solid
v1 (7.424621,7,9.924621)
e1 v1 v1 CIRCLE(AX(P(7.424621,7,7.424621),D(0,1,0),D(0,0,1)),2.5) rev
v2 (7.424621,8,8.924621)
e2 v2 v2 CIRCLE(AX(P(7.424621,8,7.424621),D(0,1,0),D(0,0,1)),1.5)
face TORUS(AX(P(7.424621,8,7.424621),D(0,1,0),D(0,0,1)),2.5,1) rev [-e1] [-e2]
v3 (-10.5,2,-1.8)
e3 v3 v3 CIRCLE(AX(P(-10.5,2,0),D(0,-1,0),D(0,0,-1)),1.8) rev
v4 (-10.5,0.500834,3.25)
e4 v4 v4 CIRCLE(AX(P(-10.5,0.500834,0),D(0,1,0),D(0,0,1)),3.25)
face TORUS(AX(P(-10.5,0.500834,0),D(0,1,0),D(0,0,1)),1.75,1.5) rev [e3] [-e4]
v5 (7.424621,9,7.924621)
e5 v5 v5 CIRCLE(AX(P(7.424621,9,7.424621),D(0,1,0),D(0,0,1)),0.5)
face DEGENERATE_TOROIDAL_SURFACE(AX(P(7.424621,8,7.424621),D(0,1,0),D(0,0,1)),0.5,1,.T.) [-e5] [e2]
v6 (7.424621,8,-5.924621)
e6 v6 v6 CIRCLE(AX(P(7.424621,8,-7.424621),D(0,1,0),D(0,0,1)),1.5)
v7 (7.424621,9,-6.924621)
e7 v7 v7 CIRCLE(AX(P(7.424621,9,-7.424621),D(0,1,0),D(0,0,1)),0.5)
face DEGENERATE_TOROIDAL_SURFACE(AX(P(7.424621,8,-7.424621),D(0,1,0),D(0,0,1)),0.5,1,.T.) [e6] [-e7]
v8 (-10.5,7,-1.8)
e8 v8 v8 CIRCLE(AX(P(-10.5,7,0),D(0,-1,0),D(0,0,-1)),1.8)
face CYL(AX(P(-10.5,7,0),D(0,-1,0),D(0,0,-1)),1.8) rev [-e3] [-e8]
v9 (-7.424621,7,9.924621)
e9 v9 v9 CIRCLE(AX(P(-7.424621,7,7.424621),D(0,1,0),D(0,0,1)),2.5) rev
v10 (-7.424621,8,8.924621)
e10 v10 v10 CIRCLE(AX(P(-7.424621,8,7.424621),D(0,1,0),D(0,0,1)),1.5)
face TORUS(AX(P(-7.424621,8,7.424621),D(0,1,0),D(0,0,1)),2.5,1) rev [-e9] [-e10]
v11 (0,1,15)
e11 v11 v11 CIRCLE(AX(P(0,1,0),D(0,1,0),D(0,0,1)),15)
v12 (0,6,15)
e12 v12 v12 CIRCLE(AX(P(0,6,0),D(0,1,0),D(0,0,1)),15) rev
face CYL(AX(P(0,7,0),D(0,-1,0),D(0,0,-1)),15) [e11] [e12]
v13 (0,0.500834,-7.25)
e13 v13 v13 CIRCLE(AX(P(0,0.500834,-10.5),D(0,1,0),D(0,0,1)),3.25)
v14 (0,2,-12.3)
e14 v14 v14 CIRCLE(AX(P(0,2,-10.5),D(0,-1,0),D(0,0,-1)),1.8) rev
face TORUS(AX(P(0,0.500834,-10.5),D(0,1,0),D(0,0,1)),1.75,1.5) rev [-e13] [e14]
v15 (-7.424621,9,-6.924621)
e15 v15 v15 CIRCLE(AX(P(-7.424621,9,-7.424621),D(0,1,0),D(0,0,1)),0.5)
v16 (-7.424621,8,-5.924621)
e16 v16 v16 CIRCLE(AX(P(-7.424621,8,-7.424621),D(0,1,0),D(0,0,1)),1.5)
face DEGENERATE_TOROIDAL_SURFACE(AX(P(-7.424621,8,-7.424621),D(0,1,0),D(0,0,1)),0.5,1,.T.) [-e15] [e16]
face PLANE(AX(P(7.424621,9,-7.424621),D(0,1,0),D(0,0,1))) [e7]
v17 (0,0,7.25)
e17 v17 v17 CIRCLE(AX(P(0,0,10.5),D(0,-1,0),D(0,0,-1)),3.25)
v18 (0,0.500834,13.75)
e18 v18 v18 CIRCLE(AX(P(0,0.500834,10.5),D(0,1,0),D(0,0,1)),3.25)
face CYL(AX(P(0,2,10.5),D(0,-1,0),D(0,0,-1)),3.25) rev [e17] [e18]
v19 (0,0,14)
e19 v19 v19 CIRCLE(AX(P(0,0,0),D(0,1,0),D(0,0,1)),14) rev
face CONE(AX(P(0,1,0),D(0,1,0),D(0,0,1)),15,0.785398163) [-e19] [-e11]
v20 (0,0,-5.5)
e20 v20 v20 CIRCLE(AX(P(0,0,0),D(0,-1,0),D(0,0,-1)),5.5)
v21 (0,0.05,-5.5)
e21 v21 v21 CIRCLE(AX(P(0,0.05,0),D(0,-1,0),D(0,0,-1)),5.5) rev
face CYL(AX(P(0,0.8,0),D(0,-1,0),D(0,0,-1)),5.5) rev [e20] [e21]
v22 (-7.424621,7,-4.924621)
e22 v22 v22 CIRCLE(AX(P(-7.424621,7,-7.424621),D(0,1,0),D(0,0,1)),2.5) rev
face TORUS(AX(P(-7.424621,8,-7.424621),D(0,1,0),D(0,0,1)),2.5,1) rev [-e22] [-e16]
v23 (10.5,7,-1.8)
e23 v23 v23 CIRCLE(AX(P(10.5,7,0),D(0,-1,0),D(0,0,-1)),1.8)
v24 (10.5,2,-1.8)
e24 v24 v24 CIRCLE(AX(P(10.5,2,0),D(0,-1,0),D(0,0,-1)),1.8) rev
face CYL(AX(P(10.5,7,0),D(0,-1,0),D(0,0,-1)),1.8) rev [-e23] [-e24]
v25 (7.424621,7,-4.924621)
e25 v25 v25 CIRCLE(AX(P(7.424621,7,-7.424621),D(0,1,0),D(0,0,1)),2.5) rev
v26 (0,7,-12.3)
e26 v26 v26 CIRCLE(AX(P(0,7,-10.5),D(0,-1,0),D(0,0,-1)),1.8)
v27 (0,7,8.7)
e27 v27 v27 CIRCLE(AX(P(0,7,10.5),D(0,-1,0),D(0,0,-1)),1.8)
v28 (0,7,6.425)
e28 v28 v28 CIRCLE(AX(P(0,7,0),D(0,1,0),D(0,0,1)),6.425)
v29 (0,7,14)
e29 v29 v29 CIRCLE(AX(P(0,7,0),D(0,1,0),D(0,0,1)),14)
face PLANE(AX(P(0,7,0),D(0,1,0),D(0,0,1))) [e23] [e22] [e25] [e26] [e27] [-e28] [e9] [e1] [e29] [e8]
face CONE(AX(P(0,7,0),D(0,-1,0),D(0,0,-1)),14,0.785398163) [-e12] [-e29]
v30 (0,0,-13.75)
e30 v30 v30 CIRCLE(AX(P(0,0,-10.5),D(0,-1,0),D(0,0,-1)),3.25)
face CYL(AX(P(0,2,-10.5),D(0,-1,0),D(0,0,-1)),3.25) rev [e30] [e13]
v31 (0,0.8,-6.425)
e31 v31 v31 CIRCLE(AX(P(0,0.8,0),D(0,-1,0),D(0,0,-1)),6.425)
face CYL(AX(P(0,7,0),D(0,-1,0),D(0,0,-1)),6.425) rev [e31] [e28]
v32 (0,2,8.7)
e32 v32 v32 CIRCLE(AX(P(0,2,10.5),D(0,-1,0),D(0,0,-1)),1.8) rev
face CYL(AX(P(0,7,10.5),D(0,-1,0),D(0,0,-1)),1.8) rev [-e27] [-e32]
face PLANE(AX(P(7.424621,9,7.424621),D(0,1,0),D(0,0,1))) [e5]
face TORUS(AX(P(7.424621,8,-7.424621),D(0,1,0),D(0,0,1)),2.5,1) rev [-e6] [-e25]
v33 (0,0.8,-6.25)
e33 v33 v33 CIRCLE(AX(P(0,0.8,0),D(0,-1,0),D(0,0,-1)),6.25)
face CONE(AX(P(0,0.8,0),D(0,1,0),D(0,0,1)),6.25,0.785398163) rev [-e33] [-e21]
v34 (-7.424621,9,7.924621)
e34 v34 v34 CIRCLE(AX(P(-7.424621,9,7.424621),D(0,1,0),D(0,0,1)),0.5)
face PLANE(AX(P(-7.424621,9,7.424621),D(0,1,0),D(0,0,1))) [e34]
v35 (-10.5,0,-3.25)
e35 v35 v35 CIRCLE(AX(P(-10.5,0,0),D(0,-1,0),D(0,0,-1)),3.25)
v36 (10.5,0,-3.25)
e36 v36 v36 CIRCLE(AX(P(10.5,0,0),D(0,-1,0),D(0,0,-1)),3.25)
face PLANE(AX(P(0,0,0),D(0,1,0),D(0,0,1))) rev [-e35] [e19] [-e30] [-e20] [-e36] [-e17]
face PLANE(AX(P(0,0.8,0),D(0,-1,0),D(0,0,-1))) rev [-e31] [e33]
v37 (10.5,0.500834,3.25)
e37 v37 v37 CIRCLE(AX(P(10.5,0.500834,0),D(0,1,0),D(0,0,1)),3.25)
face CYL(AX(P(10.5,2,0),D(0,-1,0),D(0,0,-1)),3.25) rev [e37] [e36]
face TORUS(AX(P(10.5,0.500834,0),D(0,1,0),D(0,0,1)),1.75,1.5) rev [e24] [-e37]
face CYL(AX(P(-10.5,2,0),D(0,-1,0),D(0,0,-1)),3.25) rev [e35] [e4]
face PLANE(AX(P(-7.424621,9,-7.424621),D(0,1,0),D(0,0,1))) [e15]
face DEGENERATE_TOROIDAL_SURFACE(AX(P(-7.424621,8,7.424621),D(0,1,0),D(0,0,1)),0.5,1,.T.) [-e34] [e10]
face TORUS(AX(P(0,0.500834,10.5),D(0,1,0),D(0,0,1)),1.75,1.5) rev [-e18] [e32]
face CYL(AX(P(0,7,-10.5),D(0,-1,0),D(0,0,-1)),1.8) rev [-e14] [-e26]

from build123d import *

# Parameters (mm, degrees)
SKETCH1_R           = 15
SKETCH1_R_2         = 6.425
BOSS_EXTRUDE1_DEPTH = 7
SKETCH2_R           = 1.8
CUT_EXTRUDE1_DEPTH  = 23.338307904
SKETCH3_R           = 3.25
CUT_EXTRUDE2_DEPTH  = 2
FILLET1_R           = 1.5
CHAMFER1_SIZE       = 1
CHAMFER2_SIZE       = 1
SKETCH4_R           = 1.5
BOSS_EXTRUDE2_DEPTH = 2
FILLET2_R           = 1
SKETCH5_R           = 6.679859281
SKETCH5_R_2         = 5.5
BOSS_EXTRUDE3_DEPTH = 0.8
CHAMFER3_SIZE       = 0.75


# Some blends are built 0.0001 mm under size
with BuildPart() as part:
    # Sketch1 → Boss-Extrude1 (new body)
    with BuildSketch(Plane(origin=(0, 0, 0), x_dir=(1, 0, 0), z_dir=(0, 1, 0))):
        with Locations(Location((0, 0, 0), (0, 0, 270))):
            Circle(SKETCH1_R)
        with Locations(Location((0, 0, 0), (0, 0, 270))):
            Circle(SKETCH1_R_2, mode=Mode.SUBTRACT)
    extrude(amount=BOSS_EXTRUDE1_DEPTH)

    # Sketch2 → Cut-Extrude1 (cut, through all)
    with BuildSketch(Plane.XZ):
        with Locations(Location((0, 10.5, 0), (0, 0, 270))):
            Circle(SKETCH2_R)
        with Locations(Location((10.5, 0, 0), (0, 0, 270))):
            Circle(SKETCH2_R)
        with Locations(Location((0, -10.5, 0), (0, 0, 270))):
            Circle(SKETCH2_R)
        with Locations(Location((-10.5, 0, 0), (0, 0, 270))):
            Circle(SKETCH2_R)
    extrude(amount=-CUT_EXTRUDE1_DEPTH, mode=Mode.SUBTRACT)

    # Sketch3 → Cut-Extrude2 (cut)
    with BuildSketch(Plane.XZ):
        with Locations(Location((0, 10.5, 0), (0, 0, 270))):
            Circle(SKETCH3_R)
        with Locations(Location((10.5, 0, 0), (0, 0, 270))):
            Circle(SKETCH3_R)
        with Locations(Location((0, -10.5, 0), (0, 0, 270))):
            Circle(SKETCH3_R)
        with Locations(Location((-10.5, 0, 0), (0, 0, 270))):
            Circle(SKETCH3_R)
    extrude(amount=-CUT_EXTRUDE2_DEPTH, mode=Mode.SUBTRACT)

    # Fillet1
    # the kernel refuses this fillet: 1.5 mm, written as the material it adds along each edge
    with BuildSketch(Plane(origin=(0, 2, 10.5), x_dir=(0, 0, -1), z_dir=(-1, 0, 0))) as fillet1_piece_1_section:
        with BuildLine():
            CenterArc((3.25 - FILLET1_R, FILLET1_R), FILLET1_R, 270, 90)
            Line((3.25 - FILLET1_R, 0), (3.25, 0))
            Line((3.25, 0), (3.25, FILLET1_R))
        make_face()
    fillet1_piece_1 = revolve(axis=Axis((0, 2, 10.5), (0, -1, 0)), mode=Mode.PRIVATE)
    fillet1_piece_1 = fillet1_piece_1 - Plane(origin=(0, 1.558044344, 10.5), x_dir=(0, 0, -1), z_dir=(0, -1, 0)) * Cylinder(1.8, 13, mode=Mode.PRIVATE)
    add(fillet1_piece_1)
    with BuildSketch(Plane(origin=(10.5, 2, 0), x_dir=(0, 0, -1), z_dir=(-1, 0, 0))) as fillet1_piece_2_section:
        with BuildLine():
            CenterArc((3.25 - FILLET1_R, FILLET1_R), FILLET1_R, 270, 90)
            Line((3.25 - FILLET1_R, 0), (3.25, 0))
            Line((3.25, 0), (3.25, FILLET1_R))
        make_face()
    fillet1_piece_2 = revolve(axis=Axis((10.5, 2, 0), (0, -1, 0)), mode=Mode.PRIVATE)
    fillet1_piece_2 = fillet1_piece_2 - Plane(origin=(10.5, 1.558044344, 0), x_dir=(0, 0, -1), z_dir=(0, -1, 0)) * Cylinder(1.8, 14, mode=Mode.PRIVATE)
    add(fillet1_piece_2)
    with BuildSketch(Plane(origin=(0, 2, -10.5), x_dir=(0, 0, -1), z_dir=(-1, 0, 0))) as fillet1_piece_3_section:
        with BuildLine():
            CenterArc((3.25 - FILLET1_R, FILLET1_R), FILLET1_R, 270, 90)
            Line((3.25 - FILLET1_R, 0), (3.25, 0))
            Line((3.25, 0), (3.25, FILLET1_R))
        make_face()
    fillet1_piece_3 = revolve(axis=Axis((0, 2, -10.5), (0, -1, 0)), mode=Mode.PRIVATE)
    fillet1_piece_3 = fillet1_piece_3 - Plane(origin=(0, 1.558044344, -10.5), x_dir=(0, 0, -1), z_dir=(0, -1, 0)) * Cylinder(1.8, 14, mode=Mode.PRIVATE)
    add(fillet1_piece_3)
    with BuildSketch(Plane(origin=(-10.5, 2, 0), x_dir=(0, 0, -1), z_dir=(-1, 0, 0))) as fillet1_piece_4_section:
        with BuildLine():
            CenterArc((3.25 - FILLET1_R, FILLET1_R), FILLET1_R, 270, 90)
            Line((3.25 - FILLET1_R, 0), (3.25, 0))
            Line((3.25, 0), (3.25, FILLET1_R))
        make_face()
    fillet1_piece_4 = revolve(axis=Axis((-10.5, 2, 0), (0, -1, 0)), mode=Mode.PRIVATE)
    fillet1_piece_4 = fillet1_piece_4 - Plane(origin=(-10.5, 1.558044344, 0), x_dir=(0, 0, -1), z_dir=(0, -1, 0)) * Cylinder(1.8, 13, mode=Mode.PRIVATE)
    add(fillet1_piece_4)

    # Chamfer1
    chamfer1_edges = [part.edges().sort_by_distance(p)[0] for p in [
        (0, 7, -15),
    ]]
    chamfer(chamfer1_edges, length=CHAMFER1_SIZE)

    # Chamfer2
    chamfer2_edges = [part.edges().sort_by_distance(p)[0] for p in [
        (0, 0, -15),
    ]]
    chamfer(chamfer2_edges, length=CHAMFER2_SIZE)

    # Sketch4 → Boss-Extrude2 (add)
    with BuildSketch(Plane(origin=(0, 7, 0), x_dir=(1, 0, 0), z_dir=(0, 1, 0))):
        with Locations(Location((7.424621202, 7.424621202, 0), (0, 0, 270))):
            Circle(SKETCH4_R)
        with Locations(Location((7.424621202, -7.424621202, 0), (0, 0, 270))):
            Circle(SKETCH4_R)
        with Locations(Location((-7.424621202, -7.424621202, 0), (0, 0, 270))):
            Circle(SKETCH4_R)
        with Locations(Location((-7.424621202, 7.424621202, 0), (0, 0, 270))):
            Circle(SKETCH4_R)
    extrude(amount=BOSS_EXTRUDE2_DEPTH)

    # Fillet2
    fillet2_edges = [part.edges().sort_by_distance(p)[0] for p in [
        (7.424621202, 7, -8.924621202),
        (7.424621202, 9, -8.924621202),
        (7.424621202, 7, 5.924621202),
        (7.424621202, 9, 5.924621202),
        (-7.424621202, 7, 5.924621202),
        (-7.424621202, 9, 5.924621202),
        (-7.424621202, 7, -8.924621202),
        (-7.424621202, 9, -8.924621202),
    ]]
    fillet(fillet2_edges, radius=FILLET2_R - 0.0001)  # a hair under: the kernel refuses the full size

    # Sketch5 → Boss-Extrude3 (add)
    with BuildSketch(Plane.XZ):
        Circle(SKETCH5_R)
        with Locations(Location((0, 0, 0), (0, 0, 270))):
            Circle(SKETCH5_R_2, mode=Mode.SUBTRACT)
    extrude(amount=-BOSS_EXTRUDE3_DEPTH)

    # Chamfer3
    chamfer3_edges = [part.edges().sort_by_distance(p)[0] for p in [
        (0, 0.8, 5.5),
    ]]
    chamfer(chamfer3_edges, length=CHAMFER3_SIZE)


solid = part.part
